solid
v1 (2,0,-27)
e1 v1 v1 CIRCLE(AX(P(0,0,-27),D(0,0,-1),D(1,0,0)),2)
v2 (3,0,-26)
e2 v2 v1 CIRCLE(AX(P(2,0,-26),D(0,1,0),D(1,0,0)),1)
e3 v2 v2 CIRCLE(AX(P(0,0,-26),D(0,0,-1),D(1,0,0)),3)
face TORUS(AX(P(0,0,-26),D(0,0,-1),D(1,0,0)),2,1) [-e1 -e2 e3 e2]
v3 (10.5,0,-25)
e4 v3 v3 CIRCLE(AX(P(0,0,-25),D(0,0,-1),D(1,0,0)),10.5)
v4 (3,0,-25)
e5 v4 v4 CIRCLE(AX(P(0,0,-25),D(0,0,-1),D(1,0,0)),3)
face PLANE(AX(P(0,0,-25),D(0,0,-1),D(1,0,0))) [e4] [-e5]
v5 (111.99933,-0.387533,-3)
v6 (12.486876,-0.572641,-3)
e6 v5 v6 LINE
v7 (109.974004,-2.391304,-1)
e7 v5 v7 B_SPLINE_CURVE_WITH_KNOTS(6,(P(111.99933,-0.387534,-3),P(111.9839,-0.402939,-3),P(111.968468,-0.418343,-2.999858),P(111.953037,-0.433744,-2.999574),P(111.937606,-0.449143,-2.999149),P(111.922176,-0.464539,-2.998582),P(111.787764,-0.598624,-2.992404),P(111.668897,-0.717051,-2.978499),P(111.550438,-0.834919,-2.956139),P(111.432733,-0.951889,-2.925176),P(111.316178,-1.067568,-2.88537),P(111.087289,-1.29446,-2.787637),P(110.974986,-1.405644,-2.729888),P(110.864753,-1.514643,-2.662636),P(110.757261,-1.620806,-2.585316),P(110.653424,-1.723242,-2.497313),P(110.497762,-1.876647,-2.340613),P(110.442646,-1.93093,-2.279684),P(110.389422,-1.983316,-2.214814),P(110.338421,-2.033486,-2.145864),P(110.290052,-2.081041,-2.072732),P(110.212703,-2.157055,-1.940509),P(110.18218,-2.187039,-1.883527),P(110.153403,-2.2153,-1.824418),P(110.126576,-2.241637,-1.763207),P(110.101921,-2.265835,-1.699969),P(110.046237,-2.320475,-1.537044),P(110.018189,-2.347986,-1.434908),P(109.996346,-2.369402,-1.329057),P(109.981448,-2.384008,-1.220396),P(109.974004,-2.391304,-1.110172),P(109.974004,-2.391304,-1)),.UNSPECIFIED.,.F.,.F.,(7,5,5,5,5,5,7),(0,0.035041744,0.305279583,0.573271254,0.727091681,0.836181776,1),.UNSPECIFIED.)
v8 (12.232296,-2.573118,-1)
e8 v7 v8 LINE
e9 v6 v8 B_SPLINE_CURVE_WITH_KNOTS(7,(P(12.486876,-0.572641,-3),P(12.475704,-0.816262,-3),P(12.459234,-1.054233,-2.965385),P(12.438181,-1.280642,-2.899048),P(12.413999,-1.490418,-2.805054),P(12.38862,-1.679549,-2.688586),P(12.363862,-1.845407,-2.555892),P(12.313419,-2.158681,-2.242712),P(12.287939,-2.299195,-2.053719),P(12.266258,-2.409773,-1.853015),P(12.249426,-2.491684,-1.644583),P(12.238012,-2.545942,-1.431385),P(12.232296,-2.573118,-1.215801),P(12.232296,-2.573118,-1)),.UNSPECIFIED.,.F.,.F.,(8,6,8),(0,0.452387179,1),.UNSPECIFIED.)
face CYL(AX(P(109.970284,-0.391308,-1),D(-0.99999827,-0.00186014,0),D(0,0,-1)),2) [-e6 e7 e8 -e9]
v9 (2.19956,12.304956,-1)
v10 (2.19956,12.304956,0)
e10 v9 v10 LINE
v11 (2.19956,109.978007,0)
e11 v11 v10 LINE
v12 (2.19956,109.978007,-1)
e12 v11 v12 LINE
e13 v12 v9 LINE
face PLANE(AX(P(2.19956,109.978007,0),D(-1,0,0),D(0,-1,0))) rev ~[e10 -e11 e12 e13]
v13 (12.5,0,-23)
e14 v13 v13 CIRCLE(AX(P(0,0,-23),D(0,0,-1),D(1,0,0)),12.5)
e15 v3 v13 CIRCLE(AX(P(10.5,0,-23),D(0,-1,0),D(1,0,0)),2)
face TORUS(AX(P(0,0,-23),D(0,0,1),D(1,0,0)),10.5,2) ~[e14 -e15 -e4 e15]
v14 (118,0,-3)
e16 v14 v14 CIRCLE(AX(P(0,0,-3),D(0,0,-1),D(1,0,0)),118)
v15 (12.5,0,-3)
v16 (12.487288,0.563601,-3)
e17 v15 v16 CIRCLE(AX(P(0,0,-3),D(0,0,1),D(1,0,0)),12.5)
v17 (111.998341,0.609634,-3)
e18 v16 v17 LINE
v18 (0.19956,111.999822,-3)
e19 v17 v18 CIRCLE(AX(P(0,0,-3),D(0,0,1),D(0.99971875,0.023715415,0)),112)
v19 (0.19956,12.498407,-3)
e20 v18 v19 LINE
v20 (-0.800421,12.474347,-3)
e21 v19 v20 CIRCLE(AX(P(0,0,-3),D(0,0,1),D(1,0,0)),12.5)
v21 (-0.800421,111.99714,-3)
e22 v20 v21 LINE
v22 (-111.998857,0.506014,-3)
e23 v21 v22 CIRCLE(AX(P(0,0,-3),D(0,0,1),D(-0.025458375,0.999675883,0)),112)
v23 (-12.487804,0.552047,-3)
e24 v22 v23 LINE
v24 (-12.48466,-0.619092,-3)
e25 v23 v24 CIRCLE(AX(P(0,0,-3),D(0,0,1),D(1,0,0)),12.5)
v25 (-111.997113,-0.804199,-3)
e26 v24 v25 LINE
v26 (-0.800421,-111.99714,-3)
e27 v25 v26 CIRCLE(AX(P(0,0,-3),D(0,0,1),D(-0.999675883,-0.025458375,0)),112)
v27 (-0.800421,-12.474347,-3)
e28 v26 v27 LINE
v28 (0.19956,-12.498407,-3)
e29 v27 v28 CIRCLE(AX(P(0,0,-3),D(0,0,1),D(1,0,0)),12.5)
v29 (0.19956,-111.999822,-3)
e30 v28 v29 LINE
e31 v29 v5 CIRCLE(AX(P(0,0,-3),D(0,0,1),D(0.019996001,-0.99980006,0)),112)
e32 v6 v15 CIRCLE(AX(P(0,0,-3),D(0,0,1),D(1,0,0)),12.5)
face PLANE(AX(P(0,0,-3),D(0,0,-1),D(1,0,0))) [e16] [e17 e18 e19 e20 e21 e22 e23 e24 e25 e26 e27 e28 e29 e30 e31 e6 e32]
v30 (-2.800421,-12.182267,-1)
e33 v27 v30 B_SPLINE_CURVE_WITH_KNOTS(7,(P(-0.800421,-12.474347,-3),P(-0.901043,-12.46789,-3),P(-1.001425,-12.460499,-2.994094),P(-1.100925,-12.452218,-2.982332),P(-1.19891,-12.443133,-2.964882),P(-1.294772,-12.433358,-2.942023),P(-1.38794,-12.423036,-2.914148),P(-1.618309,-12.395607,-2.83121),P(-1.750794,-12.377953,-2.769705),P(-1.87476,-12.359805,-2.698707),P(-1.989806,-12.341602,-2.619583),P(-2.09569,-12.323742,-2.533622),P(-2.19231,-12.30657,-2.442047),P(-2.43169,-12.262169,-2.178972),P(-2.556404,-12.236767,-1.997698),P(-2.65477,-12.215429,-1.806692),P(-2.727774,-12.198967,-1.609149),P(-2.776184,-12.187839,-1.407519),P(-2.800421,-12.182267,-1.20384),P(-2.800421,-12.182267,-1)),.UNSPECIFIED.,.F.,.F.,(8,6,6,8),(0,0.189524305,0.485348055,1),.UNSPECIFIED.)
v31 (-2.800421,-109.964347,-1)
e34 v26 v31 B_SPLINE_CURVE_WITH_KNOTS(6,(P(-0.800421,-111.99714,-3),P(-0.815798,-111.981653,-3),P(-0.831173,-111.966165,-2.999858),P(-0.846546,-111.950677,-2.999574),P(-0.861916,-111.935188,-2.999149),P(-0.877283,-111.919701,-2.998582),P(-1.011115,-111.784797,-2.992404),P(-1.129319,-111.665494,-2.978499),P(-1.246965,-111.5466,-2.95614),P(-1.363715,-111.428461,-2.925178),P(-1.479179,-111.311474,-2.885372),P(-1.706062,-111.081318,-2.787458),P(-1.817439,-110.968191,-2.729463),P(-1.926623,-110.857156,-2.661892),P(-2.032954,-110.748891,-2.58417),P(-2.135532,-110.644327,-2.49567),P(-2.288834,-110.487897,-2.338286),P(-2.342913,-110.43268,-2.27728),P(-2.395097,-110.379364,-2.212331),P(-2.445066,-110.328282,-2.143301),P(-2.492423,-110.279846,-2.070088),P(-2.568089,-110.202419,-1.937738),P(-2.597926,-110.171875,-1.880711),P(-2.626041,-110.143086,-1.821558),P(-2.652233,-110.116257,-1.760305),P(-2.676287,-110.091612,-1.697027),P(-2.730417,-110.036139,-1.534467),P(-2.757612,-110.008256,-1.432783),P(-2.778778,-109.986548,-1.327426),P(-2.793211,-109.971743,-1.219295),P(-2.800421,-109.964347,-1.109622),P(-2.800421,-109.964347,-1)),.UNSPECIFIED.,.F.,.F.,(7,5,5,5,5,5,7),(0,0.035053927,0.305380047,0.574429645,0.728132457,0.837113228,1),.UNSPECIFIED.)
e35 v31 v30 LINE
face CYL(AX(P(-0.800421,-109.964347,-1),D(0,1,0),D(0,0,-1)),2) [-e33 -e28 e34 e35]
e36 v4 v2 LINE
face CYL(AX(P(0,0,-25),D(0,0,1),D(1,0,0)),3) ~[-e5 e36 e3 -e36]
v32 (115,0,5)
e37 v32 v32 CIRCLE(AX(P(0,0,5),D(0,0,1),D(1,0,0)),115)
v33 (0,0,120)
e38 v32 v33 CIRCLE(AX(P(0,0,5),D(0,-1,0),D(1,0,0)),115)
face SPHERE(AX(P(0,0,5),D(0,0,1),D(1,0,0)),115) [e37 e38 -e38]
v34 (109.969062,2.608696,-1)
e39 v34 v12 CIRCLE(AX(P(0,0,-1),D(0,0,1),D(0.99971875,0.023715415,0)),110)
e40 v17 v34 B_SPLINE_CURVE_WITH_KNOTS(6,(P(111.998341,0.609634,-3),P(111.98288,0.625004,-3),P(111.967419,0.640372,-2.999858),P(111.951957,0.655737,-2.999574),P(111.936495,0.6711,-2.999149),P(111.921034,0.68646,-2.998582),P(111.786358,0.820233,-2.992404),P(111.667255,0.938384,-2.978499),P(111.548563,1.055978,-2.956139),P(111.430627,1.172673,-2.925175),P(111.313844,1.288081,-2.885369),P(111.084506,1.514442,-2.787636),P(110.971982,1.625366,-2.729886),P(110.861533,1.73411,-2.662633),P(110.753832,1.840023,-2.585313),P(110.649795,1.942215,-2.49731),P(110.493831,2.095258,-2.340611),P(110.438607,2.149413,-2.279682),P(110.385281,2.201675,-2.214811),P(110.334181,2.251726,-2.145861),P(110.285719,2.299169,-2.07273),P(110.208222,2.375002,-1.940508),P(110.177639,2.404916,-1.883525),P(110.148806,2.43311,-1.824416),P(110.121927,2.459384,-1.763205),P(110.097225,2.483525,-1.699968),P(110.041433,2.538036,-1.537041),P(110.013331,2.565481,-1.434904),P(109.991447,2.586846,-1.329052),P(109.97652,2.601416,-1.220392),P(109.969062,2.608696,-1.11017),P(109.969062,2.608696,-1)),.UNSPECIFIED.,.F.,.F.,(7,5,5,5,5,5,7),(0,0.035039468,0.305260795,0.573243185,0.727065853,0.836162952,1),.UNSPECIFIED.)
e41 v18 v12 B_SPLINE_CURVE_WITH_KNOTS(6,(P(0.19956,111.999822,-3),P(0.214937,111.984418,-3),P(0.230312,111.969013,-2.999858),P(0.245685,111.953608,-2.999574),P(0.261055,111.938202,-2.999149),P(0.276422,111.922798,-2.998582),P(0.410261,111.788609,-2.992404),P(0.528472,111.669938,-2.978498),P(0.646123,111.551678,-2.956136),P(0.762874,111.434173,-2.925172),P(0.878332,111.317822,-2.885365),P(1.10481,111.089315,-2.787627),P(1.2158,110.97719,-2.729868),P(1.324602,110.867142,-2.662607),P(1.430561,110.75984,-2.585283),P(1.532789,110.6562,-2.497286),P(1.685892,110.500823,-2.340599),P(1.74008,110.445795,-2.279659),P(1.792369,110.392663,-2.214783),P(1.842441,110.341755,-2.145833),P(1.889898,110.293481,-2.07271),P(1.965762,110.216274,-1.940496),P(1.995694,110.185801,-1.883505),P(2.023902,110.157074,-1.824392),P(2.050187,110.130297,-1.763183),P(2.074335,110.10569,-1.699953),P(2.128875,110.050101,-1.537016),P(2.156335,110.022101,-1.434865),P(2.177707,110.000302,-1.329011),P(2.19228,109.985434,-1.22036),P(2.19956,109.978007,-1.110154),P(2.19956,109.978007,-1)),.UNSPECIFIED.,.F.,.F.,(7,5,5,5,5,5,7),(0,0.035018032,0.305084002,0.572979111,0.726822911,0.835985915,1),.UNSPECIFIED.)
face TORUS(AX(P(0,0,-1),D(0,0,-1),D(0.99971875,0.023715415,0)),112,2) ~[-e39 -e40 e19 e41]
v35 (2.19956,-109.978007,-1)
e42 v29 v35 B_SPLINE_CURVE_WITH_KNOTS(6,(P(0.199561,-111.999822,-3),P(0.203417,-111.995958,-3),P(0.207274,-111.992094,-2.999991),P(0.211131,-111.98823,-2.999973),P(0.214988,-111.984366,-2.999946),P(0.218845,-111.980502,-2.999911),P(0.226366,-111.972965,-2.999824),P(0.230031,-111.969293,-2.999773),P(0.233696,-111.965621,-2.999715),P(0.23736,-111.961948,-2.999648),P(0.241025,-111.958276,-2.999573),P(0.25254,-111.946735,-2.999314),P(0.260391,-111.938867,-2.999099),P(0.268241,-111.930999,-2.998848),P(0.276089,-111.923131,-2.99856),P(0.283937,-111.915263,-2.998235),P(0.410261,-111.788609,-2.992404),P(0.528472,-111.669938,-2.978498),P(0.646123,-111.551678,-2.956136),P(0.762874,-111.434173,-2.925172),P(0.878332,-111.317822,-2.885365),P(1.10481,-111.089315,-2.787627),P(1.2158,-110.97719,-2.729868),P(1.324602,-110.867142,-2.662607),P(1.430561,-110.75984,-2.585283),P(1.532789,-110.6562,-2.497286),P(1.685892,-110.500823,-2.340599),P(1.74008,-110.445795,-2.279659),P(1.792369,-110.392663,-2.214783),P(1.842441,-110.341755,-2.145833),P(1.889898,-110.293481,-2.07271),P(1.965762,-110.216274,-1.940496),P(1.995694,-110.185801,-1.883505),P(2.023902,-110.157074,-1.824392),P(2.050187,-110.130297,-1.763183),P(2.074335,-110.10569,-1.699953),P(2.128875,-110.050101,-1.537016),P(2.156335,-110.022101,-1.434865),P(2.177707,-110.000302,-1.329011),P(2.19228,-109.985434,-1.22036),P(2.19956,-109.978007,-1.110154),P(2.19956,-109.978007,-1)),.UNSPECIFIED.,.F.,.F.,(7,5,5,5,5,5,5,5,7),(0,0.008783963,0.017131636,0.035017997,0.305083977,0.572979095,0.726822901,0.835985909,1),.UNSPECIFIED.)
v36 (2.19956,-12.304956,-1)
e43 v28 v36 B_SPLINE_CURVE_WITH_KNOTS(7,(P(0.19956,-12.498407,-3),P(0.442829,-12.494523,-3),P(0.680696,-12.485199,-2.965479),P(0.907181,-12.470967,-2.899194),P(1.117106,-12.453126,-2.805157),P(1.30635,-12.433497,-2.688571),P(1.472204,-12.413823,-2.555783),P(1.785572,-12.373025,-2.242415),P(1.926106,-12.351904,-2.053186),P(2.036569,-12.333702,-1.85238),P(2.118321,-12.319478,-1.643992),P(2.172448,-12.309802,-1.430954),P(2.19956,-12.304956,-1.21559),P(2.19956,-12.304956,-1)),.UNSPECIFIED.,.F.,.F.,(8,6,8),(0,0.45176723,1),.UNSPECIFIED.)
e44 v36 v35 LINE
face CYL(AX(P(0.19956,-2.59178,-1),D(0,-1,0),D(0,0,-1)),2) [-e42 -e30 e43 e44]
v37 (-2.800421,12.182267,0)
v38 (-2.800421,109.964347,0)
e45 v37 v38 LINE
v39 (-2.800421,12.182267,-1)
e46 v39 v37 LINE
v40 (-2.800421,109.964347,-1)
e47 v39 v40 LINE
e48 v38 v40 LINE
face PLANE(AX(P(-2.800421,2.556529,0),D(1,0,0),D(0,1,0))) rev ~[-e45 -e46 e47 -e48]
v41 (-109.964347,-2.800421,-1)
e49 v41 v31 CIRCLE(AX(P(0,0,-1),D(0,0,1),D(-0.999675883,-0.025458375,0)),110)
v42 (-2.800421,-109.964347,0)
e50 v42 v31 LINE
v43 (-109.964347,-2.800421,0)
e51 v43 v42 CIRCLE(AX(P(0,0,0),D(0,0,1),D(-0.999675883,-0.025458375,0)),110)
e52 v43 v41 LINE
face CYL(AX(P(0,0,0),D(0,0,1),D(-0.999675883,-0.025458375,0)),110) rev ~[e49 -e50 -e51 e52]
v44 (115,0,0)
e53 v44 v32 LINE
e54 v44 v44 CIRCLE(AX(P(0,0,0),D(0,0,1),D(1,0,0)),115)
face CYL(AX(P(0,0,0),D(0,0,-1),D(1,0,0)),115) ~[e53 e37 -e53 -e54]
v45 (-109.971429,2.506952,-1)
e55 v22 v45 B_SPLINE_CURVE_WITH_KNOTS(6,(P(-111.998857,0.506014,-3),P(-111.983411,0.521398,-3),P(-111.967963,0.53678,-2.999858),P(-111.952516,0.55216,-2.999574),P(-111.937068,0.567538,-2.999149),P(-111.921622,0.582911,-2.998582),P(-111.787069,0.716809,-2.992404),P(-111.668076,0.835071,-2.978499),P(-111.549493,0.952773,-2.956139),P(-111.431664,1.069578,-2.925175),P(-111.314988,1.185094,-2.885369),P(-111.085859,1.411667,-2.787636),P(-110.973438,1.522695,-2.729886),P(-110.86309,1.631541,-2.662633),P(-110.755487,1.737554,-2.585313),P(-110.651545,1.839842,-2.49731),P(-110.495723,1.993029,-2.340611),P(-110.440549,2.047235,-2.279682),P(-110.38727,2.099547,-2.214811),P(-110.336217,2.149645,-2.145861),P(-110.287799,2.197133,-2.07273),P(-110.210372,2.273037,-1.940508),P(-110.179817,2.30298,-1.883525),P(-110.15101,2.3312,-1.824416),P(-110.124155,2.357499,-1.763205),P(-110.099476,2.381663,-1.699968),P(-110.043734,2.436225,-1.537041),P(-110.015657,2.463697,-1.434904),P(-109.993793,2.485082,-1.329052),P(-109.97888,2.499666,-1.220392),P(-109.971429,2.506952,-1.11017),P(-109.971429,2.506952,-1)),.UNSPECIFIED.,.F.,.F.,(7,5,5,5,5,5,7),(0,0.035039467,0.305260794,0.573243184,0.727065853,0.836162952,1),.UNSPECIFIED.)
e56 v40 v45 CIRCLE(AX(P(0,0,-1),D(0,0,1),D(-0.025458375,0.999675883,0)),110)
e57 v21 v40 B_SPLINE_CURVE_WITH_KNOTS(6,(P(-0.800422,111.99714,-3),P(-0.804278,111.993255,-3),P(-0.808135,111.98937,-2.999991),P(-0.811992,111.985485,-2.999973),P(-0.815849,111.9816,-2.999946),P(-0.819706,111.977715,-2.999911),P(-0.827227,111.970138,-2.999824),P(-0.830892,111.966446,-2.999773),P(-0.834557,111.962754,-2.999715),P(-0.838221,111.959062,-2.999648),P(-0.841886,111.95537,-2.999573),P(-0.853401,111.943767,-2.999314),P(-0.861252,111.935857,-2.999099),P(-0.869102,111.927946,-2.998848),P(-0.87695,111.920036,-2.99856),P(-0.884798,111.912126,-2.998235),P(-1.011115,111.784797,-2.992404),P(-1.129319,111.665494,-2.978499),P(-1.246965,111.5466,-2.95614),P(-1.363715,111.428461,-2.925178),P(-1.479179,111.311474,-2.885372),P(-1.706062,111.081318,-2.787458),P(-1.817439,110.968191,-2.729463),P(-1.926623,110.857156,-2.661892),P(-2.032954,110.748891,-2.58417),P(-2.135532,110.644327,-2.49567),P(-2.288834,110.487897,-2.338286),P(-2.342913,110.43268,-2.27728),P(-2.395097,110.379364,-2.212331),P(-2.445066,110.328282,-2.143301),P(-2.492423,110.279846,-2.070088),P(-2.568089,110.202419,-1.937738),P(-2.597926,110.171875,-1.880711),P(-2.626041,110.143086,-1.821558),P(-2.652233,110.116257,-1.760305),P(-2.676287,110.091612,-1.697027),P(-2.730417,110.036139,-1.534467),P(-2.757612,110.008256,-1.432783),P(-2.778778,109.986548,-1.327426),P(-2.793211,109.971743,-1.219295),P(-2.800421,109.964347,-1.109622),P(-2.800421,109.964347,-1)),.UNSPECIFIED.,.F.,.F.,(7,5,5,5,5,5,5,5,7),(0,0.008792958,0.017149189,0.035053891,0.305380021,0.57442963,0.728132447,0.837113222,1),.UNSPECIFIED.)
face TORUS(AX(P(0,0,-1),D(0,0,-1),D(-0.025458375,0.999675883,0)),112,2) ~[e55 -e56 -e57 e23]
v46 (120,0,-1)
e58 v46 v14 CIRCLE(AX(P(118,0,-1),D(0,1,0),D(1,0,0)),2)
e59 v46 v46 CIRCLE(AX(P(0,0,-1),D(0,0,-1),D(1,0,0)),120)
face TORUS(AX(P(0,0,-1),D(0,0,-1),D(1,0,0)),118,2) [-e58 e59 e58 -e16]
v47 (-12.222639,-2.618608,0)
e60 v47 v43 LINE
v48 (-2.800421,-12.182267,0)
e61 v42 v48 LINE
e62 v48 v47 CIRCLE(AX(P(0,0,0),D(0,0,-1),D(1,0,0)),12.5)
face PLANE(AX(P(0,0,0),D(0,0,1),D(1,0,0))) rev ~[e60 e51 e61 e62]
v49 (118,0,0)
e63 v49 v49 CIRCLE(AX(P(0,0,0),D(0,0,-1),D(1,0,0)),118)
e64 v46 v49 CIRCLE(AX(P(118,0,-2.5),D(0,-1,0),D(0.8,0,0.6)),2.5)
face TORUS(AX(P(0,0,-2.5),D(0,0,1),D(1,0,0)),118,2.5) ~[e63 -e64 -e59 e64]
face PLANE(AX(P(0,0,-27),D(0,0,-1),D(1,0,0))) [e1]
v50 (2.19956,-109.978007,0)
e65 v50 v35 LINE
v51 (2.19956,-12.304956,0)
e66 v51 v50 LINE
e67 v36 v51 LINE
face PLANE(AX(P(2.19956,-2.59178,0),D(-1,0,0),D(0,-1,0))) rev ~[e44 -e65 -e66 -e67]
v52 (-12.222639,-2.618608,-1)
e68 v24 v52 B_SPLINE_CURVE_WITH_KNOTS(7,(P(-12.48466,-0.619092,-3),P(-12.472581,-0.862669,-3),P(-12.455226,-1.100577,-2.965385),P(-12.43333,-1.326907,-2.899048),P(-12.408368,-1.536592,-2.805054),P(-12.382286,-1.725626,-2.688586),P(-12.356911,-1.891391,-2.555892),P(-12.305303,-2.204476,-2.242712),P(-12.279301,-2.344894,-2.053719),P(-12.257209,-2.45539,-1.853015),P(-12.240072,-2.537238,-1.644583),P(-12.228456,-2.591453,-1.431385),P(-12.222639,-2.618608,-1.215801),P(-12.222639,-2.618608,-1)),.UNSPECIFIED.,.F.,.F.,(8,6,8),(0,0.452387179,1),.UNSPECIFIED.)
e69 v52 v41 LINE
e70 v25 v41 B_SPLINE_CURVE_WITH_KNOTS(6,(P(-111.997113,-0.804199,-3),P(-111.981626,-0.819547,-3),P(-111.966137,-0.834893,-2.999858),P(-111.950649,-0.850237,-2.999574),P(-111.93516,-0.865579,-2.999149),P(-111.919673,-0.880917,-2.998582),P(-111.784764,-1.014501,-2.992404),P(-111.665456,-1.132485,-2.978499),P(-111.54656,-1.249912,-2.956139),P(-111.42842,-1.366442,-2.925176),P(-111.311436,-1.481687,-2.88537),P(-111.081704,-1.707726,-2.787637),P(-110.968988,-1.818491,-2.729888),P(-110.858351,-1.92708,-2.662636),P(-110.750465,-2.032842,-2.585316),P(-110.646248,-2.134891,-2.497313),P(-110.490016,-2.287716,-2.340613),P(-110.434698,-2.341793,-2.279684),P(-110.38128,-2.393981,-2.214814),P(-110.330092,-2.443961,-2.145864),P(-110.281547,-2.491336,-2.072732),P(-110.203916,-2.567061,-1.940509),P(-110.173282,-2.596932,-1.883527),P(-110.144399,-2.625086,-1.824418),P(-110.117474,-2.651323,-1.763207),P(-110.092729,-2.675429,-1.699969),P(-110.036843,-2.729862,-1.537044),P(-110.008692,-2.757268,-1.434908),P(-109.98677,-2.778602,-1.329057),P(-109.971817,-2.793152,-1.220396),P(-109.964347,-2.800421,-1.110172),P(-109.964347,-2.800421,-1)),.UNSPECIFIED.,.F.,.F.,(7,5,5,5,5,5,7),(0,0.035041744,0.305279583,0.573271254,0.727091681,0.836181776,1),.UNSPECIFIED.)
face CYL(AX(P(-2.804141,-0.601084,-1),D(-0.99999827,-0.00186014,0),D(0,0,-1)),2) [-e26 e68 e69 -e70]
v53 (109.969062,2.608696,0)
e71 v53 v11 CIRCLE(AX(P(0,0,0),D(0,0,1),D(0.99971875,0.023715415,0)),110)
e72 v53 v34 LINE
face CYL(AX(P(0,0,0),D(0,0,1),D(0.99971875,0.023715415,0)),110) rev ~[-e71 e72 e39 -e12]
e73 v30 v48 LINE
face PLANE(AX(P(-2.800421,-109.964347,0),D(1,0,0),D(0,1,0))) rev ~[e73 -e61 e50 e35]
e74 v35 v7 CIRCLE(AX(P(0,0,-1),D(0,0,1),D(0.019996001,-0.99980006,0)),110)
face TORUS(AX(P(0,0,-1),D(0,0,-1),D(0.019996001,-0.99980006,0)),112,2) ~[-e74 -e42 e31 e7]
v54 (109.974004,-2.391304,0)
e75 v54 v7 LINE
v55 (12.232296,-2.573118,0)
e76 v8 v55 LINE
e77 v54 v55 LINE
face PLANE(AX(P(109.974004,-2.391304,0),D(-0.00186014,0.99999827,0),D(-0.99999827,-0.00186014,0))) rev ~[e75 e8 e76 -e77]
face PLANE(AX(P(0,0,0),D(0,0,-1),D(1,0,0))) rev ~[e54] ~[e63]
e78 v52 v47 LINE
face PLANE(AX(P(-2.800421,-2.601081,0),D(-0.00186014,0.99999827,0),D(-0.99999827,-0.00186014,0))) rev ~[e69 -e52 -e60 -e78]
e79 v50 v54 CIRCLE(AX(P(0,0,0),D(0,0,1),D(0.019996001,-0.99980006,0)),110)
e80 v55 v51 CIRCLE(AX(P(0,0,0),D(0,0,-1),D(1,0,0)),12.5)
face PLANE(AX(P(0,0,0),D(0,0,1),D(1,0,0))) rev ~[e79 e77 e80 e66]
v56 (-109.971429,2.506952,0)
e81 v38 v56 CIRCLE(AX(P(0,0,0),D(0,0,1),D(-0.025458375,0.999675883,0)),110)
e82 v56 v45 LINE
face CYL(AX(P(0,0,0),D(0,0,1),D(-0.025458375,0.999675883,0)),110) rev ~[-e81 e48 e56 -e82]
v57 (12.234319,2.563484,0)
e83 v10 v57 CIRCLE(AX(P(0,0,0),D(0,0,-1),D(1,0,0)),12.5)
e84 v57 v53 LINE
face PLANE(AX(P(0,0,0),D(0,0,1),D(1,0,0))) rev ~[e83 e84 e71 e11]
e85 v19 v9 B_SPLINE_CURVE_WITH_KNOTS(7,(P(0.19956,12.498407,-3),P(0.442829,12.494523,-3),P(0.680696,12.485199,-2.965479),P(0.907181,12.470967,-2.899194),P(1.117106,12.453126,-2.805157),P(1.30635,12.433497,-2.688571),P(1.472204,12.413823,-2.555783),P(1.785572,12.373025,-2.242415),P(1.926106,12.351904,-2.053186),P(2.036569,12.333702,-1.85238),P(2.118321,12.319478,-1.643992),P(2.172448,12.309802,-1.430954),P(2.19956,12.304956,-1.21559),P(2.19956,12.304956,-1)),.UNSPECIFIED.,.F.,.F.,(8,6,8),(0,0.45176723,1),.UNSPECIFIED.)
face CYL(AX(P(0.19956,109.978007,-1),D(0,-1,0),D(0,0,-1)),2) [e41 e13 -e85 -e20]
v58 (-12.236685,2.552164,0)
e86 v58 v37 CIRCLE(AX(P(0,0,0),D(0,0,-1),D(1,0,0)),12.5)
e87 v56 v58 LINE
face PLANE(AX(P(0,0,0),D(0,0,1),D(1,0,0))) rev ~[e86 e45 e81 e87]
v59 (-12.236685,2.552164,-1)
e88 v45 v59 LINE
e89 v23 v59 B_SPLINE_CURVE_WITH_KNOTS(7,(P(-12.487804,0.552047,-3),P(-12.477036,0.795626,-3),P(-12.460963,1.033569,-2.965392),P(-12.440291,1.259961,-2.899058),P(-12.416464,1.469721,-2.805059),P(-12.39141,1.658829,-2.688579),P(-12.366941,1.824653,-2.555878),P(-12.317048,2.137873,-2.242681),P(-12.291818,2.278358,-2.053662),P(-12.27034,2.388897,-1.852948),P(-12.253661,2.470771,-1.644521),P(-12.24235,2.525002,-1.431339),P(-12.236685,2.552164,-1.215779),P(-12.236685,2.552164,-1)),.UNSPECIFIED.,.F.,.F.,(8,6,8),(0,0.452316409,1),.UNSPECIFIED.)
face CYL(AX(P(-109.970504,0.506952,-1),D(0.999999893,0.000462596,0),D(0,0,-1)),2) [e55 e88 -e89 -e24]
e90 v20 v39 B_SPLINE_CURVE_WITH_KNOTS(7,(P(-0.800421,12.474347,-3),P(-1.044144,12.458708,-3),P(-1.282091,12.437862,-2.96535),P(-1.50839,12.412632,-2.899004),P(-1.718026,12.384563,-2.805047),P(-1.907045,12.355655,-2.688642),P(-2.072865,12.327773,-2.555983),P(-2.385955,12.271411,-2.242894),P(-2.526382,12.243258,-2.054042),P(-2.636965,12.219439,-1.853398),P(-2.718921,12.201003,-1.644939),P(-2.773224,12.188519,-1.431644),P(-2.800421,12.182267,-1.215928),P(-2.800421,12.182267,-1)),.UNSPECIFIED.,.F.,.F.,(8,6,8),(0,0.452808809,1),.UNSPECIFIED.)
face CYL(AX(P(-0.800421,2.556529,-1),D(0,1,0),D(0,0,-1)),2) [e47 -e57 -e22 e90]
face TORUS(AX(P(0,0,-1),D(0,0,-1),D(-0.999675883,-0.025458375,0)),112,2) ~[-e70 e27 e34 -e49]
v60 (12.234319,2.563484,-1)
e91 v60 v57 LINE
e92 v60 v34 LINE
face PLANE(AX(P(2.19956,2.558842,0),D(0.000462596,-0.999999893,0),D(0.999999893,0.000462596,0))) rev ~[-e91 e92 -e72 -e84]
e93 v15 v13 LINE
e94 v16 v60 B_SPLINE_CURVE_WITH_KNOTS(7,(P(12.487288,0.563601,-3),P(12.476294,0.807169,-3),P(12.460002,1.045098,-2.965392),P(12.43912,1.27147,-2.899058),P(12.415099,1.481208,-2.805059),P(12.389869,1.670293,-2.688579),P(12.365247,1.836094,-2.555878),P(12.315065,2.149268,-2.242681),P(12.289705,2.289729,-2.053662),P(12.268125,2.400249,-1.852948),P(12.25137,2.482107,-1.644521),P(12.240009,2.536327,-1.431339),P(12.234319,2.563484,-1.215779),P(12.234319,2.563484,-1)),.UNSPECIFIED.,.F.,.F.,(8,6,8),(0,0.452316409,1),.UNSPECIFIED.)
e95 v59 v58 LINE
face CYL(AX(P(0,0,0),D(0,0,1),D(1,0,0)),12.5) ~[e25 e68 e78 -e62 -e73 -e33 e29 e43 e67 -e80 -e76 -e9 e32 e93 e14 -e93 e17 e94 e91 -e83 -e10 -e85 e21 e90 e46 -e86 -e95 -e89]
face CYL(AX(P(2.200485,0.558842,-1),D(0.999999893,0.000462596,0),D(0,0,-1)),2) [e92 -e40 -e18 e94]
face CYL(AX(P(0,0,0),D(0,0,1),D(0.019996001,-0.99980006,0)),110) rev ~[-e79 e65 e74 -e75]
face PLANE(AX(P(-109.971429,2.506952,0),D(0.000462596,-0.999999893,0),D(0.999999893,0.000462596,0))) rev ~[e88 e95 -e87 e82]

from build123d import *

# Parameters (mm, degrees)
F0_R      = 115
F1_DEPTH  = 120
F2_R      = 115
F3_R      = 120
F4_DEPTH  = 3
F5_R      = 2
F7_R      = 12.5
F8_DEPTH  = 25
F9_R      = 3
F10_DEPTH = 2
F11_R     = 1
F12_R     = 2


# Not quite as in the source:
# - a fillet or chamfer that OpenCascade refuses, or shapes differently, is made with other operations: its cross-section is extruded or revolved along the edge and cut away or added


with BuildPart() as f1:
    # F0 (on Top) → F1 (new body)
    with BuildSketch(Plane.XY):
        Circle(F0_R)
    extrude(amount=F1_DEPTH)

    # F2
    f2_edges = [f1.edges().sort_by_distance(p)[0] for p in [
        (-115, 0, 120),
    ]]
    fillet(f2_edges, radius=F2_R)

    # F3 (on face) → F4 (join)
    with BuildSketch(Plane(origin=(0, 0, 0), x_dir=(1, 0, 0), z_dir=(0, 0, -1))):
        Circle(F3_R)
        with BuildLine():
            Line((-2.8004212099, -2.5565289863), (-2.8004212099, -109.964347136))
            ThreePointArc((-2.8004212099, -109.964347136), (-77.8854638737, -77.6778895), (-109.9714289755, -2.5069521507))
            Line((-109.9714289755, -2.5069521507), (-2.8004212099, -2.5565289863))
        make_face(mode=Mode.SUBTRACT)
        with BuildLine():
            ThreePointArc((109.9690624994, -2.6086956522), (77.6369255508, -77.9262971725), (2.199560132, -109.9780065978))
            Line((2.199560132, -109.9780065978), (2.199560132, -2.5588419556))
            Line((2.199560132, -2.5588419556), (109.9690624994, -2.6086956522))
        make_face(mode=Mode.SUBTRACT)
        with BuildLine():
            Line((-2.8004212099, 2.6010809458), (-109.964347136, 2.8004212099))
            ThreePointArc((-109.964347136, 2.8004212099), (-77.7817459305, 77.7817459305), (-2.8004212099, 109.964347136))
            Line((-2.8004212099, 109.964347136), (-2.8004212099, 2.6010809458))
        make_face(mode=Mode.SUBTRACT)
        with BuildLine():
            ThreePointArc((2.199560132, 109.9780065978), (77.7139097925, 77.8495229578), (109.9740044898, 2.3913043478))
            Line((109.9740044898, 2.3913043478), (2.199560132, 2.5917802638))
            Line((2.199560132, 2.5917802638), (2.199560132, 109.9780065978))
        make_face(mode=Mode.SUBTRACT)
    extrude(amount=F4_DEPTH)

    # F5
    f5_edges = [f1.edges().sort_by_distance(p)[0] for p in [
        (-56.382384, -2.700751, -3),
        (-56.385925, 2.531741, -3),
        (-2.800421, 56.260438, -3),
        (2.19956, 56.268424, -3),
        (56.086782, -2.491542, -3),
        (56.084311, 2.583769, -3),
        (2.19956, -56.284893, -3),
        (-2.800421, -56.282714, -3),
        (-77.781746, -77.781746, -3),
        (-77.885464, 77.67789, -3),
        (-120, 0, -3),
        (77.71391, -77.849523, -3),
        (77.636926, 77.926297, -3),
    ]]
    fillet(f5_edges, radius=F5_R)

    # F6: fillet of radius 2.5 on 1 edges, made by hand

    # F6_s1 → F6_t2 (revolve, cut)
    with BuildSketch(Plane.XZ):
        with BuildLine():
            ThreePointArc((120, -1), (119.1180339887, -0.2639320225), (118, 0))
            Line((118, 0), (120, 0))
            Line((120, 0), (120, -1))
        make_face()
    revolve(axis=Axis((0, 0, 0), (0, 0, -1)), mode=Mode.SUBTRACT)

    # F7 (on face) → F8 (join)
    with BuildSketch(Plane(origin=(0, 0, 0), x_dir=(1, 0, 0), z_dir=(0, 0, -1))):
        Circle(F7_R)
    extrude(amount=F8_DEPTH)

    # F9 (on face) → F10 (join)
    with BuildSketch(Plane(origin=(0, 0, -25), x_dir=(1, 0, 0), z_dir=(0, 0, -1))):
        Circle(F9_R)
    extrude(amount=F10_DEPTH)

    # F11
    f11_edges = [f1.edges().sort_by_distance(p)[0] for p in [
        (-3, 0, -27),
    ]]
    fillet(f11_edges, radius=F11_R)

    # F12
    f12_edges = [f1.edges().sort_by_distance(p)[0] for p in [
        (-12.5, 0, -25),
    ]]
    fillet(f12_edges, radius=F12_R)


solid = f1.part
